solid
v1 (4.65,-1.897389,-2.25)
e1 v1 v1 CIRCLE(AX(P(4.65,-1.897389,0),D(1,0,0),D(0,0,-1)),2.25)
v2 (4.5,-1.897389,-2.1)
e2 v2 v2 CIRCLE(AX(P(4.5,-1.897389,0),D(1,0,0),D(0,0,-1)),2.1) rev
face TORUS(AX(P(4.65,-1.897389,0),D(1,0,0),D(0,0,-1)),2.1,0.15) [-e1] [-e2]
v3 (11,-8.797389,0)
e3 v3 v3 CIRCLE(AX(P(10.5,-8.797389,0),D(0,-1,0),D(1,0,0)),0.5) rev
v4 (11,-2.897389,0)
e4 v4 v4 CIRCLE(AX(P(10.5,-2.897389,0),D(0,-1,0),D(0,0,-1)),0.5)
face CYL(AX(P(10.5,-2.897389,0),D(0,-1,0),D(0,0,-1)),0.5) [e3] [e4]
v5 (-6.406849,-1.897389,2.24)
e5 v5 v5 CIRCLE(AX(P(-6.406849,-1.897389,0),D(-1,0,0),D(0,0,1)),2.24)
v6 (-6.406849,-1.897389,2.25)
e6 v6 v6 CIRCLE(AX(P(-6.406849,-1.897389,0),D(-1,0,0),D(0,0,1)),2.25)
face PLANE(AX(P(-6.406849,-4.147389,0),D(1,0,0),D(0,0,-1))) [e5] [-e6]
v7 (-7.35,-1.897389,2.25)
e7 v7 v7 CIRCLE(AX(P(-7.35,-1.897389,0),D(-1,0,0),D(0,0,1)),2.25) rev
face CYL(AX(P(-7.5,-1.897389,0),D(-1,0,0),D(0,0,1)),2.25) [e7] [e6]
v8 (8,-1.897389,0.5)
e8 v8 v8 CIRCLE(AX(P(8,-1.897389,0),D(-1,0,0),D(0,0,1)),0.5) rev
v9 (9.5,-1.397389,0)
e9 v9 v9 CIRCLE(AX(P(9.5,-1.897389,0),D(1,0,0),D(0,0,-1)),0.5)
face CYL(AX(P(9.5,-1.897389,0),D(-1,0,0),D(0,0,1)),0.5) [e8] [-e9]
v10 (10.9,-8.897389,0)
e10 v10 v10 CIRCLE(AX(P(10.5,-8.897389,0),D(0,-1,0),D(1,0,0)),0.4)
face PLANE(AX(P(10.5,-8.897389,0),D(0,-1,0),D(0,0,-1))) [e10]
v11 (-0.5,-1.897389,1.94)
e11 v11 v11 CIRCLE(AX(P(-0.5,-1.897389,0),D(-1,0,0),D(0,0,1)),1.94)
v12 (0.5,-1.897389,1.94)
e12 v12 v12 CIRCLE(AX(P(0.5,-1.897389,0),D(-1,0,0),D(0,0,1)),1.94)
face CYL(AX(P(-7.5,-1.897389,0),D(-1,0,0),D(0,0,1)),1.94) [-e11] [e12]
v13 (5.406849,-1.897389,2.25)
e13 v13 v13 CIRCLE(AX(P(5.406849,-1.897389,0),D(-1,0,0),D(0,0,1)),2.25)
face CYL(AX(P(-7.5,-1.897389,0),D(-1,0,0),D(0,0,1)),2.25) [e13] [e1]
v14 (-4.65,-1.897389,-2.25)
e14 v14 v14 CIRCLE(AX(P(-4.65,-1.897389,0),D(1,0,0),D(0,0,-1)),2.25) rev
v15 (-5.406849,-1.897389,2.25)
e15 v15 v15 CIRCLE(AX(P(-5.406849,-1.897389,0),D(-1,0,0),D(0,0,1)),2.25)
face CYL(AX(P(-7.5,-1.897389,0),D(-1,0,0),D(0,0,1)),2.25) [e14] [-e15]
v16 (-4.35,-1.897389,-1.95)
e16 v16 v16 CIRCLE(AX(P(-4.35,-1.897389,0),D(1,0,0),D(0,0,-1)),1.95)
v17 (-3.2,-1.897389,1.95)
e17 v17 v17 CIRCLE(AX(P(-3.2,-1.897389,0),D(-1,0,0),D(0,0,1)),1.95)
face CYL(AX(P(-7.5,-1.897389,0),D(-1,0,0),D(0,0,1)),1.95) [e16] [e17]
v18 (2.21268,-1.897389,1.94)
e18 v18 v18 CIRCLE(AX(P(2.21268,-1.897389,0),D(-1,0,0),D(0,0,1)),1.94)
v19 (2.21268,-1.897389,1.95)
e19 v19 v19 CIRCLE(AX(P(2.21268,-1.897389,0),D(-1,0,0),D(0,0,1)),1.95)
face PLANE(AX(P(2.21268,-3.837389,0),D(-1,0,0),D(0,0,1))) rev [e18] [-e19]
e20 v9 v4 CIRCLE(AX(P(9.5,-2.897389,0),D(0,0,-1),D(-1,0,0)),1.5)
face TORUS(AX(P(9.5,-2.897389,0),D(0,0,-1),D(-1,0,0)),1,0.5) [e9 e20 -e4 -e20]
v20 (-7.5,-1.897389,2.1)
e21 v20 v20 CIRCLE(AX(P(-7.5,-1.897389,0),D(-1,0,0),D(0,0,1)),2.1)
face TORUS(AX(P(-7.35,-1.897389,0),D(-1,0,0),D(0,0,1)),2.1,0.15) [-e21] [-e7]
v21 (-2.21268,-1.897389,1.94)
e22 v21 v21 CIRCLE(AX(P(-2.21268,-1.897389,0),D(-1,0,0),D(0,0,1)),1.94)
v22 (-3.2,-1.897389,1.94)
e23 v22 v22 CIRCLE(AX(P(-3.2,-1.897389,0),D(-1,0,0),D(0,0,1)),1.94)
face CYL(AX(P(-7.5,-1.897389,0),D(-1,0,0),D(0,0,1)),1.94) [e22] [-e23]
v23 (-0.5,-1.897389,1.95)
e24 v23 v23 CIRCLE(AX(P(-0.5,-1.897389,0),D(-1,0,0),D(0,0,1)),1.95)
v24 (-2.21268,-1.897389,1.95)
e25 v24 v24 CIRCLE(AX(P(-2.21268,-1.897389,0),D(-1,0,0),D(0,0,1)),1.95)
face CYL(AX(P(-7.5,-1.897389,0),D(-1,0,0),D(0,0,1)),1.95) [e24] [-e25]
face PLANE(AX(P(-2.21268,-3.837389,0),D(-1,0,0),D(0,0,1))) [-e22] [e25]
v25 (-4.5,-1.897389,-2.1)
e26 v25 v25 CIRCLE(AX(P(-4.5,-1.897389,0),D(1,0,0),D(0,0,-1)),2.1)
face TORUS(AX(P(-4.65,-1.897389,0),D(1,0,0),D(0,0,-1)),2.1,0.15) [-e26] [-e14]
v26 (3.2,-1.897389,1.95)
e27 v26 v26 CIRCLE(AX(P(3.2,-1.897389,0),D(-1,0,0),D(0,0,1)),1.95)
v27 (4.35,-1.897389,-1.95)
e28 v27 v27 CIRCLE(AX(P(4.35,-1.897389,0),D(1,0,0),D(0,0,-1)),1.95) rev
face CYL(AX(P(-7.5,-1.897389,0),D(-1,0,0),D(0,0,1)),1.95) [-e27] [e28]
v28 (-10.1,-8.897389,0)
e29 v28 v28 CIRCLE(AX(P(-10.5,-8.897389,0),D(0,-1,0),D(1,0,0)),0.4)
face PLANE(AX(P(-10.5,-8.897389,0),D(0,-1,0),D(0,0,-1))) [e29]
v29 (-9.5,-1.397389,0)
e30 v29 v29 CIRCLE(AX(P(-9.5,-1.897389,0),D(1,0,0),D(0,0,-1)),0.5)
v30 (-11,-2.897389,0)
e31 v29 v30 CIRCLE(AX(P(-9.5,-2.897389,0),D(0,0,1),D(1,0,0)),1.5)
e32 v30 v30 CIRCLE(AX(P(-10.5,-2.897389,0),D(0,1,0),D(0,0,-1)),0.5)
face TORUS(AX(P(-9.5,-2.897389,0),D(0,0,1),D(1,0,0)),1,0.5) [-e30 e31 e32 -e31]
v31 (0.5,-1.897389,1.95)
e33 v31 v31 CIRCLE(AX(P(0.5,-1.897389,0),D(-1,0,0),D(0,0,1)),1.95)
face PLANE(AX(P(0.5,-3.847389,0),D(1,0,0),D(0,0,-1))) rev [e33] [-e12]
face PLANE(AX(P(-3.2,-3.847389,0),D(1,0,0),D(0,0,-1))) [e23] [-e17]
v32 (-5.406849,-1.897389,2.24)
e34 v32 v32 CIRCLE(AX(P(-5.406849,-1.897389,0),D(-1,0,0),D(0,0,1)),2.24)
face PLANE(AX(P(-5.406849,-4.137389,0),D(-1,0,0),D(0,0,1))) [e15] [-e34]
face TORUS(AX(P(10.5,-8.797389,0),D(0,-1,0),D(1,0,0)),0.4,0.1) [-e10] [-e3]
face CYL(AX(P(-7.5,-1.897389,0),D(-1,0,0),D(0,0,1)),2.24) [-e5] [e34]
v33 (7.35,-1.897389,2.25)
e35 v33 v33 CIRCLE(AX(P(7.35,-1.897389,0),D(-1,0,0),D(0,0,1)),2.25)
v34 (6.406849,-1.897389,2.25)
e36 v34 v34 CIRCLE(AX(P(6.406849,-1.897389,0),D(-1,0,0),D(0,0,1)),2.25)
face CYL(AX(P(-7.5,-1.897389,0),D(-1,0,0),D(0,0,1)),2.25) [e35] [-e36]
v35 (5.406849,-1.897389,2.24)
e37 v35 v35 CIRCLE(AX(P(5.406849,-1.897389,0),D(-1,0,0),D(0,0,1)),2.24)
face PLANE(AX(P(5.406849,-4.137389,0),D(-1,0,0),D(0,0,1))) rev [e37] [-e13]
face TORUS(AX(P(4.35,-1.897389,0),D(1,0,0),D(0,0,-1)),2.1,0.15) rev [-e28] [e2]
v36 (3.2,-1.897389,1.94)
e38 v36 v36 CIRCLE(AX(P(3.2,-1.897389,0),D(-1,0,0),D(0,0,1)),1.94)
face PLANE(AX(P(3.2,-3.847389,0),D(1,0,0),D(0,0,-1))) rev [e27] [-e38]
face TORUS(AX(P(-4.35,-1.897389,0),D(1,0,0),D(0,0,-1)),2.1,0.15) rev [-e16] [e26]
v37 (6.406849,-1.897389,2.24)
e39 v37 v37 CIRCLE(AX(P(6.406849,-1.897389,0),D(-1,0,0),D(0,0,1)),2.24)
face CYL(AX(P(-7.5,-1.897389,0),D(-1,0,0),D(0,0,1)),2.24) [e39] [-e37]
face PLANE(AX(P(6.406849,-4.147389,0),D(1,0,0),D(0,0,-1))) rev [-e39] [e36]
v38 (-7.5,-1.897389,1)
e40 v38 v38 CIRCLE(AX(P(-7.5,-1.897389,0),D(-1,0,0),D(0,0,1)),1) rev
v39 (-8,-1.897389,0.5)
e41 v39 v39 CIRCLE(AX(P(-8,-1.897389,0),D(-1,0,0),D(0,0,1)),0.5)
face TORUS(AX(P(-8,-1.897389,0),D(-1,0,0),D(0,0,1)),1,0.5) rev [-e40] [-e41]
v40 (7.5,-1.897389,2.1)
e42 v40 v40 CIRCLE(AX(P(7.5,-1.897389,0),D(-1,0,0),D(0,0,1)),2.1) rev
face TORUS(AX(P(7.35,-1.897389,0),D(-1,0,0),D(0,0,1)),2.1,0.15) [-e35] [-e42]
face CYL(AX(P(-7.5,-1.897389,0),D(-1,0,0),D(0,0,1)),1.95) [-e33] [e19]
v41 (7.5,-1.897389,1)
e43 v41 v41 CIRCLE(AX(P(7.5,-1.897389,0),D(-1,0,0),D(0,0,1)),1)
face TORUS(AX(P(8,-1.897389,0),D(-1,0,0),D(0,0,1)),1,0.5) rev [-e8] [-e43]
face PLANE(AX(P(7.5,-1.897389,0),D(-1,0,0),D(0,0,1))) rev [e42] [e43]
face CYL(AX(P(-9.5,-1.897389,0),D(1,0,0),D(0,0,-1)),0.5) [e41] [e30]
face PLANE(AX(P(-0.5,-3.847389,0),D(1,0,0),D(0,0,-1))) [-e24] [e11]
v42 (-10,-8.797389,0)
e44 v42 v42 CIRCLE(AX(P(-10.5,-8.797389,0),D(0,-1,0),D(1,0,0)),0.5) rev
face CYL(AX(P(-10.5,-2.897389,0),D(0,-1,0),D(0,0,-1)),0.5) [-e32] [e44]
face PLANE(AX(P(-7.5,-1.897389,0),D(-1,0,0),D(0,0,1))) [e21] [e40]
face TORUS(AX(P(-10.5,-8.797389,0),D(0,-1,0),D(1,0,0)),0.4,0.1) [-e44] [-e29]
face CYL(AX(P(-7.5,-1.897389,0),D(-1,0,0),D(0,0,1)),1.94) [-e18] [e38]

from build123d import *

# Parameters (mm, degrees)
SKETCH3_R = 0.5
FILLET1_R = 0.1
FILLET2_R = 0.15
FILLET3_R = 0.15
FILLET4_R = 0.5


with BuildPart() as part:
    # Sketch1 → Revolve2 (revolve)
    with BuildSketch(Plane.XY, mode=Mode.PRIVATE) as revolve2_sk:
        Polygon((-7.5, -1.897389039), (7.5, -1.897389039), (7.5, -4.147389039), (6.406849222, -4.147389039), (6.406849222, -4.137389039), (5.406849222, -4.137389039), (5.406849222, -4.147389039), (4.5, -4.147389039), (4.5, -3.847389039), (3.2, -3.847389039), (3.2, -3.837389039), (2.212680485, -3.837389039), (2.212680485, -3.847389039), (0.5, -3.847389039), (0.5, -3.837389039), (-0.5, -3.837389039), (-0.5, -3.847389039), (-2.212680485, -3.847389039), (-2.212680485, -3.837389039), (-3.2, -3.837389039), (-3.2, -3.847389039), (-4.5, -3.847389039), (-4.5, -4.147389039), (-5.406849222, -4.147389039), (-5.406849222, -4.137389039), (-6.406849222, -4.137389039), (-6.406849222, -4.147389039), (-7.5, -4.147389039), align=None)
    revolve(revolve2_sk.sketch.rotate(Axis((-7.5, -1.897389039, 0), (1, 0, 0)), 270), axis=Axis((-7.5, -1.897389039, 0), (1, 0, 0)))

    # Sweep1: sweep along a curve in space
    with BuildLine() as sweep1_path:
        Line((7.5, -1.897389039, 0), (9.5, -1.897389039, 0))
        ThreePointArc((10.5, -2.897389039, 0), (10.207106781, -2.190282258, 0), (9.5, -1.897389039, 0))
        Line((10.5, -2.897389039, 0), (10.5, -8.897389039, 0))
    # Sketch3 → Sweep1 (sweep)
    with BuildSketch(Plane(origin=(7.5, 0, 0), x_dir=(0, 0, -1), z_dir=(1, 0, 0))):
        with Locations((0, -1.897389039)):
            Circle(SKETCH3_R)
    sweep1 = sweep(path=sweep1_path.line)

    # Mirror1: Sweep1 across plane
    add(sweep1.mirror(Plane(origin=(0, 0, 0), x_dir=(0, 0, 1), z_dir=(1, 0, 0))))

    # Fillet1
    fillet1_edges = [part.edges().sort_by_distance(p)[0] for p in [
        (10.5, -8.897389039, 0.5),
        (-10.5, -8.897389039, 0.5),
    ]]
    fillet(fillet1_edges, radius=FILLET1_R)

    # Fillet2
    fillet2_edges = [part.edges().sort_by_distance(p)[0] for p in [
        (-7.5, -1.897389039, -2.25),
        (7.5, -1.897389039, -2.25),
        (4.5, -1.897389039, -2.25),
        (-4.5, -1.897389039, -2.25),
    ]]
    fillet(fillet2_edges, radius=FILLET2_R)

    # Fillet3
    fillet3_edges = [part.edges().sort_by_distance(p)[0] for p in [
        (4.5, -1.897389039, -1.95),
        (-4.5, -1.897389039, -1.95),
    ]]
    fillet(fillet3_edges, radius=FILLET3_R - 0.0001)  # a hair under: the kernel refuses the full size

    # Fillet4
    fillet4_edges = [part.edges().sort_by_distance(p)[0] for p in [
        (7.5, -1.897389039, 0.5),
        (-7.5, -1.897389039, 0.5),
    ]]
    fillet(fillet4_edges, radius=FILLET4_R)


solid = part.part
